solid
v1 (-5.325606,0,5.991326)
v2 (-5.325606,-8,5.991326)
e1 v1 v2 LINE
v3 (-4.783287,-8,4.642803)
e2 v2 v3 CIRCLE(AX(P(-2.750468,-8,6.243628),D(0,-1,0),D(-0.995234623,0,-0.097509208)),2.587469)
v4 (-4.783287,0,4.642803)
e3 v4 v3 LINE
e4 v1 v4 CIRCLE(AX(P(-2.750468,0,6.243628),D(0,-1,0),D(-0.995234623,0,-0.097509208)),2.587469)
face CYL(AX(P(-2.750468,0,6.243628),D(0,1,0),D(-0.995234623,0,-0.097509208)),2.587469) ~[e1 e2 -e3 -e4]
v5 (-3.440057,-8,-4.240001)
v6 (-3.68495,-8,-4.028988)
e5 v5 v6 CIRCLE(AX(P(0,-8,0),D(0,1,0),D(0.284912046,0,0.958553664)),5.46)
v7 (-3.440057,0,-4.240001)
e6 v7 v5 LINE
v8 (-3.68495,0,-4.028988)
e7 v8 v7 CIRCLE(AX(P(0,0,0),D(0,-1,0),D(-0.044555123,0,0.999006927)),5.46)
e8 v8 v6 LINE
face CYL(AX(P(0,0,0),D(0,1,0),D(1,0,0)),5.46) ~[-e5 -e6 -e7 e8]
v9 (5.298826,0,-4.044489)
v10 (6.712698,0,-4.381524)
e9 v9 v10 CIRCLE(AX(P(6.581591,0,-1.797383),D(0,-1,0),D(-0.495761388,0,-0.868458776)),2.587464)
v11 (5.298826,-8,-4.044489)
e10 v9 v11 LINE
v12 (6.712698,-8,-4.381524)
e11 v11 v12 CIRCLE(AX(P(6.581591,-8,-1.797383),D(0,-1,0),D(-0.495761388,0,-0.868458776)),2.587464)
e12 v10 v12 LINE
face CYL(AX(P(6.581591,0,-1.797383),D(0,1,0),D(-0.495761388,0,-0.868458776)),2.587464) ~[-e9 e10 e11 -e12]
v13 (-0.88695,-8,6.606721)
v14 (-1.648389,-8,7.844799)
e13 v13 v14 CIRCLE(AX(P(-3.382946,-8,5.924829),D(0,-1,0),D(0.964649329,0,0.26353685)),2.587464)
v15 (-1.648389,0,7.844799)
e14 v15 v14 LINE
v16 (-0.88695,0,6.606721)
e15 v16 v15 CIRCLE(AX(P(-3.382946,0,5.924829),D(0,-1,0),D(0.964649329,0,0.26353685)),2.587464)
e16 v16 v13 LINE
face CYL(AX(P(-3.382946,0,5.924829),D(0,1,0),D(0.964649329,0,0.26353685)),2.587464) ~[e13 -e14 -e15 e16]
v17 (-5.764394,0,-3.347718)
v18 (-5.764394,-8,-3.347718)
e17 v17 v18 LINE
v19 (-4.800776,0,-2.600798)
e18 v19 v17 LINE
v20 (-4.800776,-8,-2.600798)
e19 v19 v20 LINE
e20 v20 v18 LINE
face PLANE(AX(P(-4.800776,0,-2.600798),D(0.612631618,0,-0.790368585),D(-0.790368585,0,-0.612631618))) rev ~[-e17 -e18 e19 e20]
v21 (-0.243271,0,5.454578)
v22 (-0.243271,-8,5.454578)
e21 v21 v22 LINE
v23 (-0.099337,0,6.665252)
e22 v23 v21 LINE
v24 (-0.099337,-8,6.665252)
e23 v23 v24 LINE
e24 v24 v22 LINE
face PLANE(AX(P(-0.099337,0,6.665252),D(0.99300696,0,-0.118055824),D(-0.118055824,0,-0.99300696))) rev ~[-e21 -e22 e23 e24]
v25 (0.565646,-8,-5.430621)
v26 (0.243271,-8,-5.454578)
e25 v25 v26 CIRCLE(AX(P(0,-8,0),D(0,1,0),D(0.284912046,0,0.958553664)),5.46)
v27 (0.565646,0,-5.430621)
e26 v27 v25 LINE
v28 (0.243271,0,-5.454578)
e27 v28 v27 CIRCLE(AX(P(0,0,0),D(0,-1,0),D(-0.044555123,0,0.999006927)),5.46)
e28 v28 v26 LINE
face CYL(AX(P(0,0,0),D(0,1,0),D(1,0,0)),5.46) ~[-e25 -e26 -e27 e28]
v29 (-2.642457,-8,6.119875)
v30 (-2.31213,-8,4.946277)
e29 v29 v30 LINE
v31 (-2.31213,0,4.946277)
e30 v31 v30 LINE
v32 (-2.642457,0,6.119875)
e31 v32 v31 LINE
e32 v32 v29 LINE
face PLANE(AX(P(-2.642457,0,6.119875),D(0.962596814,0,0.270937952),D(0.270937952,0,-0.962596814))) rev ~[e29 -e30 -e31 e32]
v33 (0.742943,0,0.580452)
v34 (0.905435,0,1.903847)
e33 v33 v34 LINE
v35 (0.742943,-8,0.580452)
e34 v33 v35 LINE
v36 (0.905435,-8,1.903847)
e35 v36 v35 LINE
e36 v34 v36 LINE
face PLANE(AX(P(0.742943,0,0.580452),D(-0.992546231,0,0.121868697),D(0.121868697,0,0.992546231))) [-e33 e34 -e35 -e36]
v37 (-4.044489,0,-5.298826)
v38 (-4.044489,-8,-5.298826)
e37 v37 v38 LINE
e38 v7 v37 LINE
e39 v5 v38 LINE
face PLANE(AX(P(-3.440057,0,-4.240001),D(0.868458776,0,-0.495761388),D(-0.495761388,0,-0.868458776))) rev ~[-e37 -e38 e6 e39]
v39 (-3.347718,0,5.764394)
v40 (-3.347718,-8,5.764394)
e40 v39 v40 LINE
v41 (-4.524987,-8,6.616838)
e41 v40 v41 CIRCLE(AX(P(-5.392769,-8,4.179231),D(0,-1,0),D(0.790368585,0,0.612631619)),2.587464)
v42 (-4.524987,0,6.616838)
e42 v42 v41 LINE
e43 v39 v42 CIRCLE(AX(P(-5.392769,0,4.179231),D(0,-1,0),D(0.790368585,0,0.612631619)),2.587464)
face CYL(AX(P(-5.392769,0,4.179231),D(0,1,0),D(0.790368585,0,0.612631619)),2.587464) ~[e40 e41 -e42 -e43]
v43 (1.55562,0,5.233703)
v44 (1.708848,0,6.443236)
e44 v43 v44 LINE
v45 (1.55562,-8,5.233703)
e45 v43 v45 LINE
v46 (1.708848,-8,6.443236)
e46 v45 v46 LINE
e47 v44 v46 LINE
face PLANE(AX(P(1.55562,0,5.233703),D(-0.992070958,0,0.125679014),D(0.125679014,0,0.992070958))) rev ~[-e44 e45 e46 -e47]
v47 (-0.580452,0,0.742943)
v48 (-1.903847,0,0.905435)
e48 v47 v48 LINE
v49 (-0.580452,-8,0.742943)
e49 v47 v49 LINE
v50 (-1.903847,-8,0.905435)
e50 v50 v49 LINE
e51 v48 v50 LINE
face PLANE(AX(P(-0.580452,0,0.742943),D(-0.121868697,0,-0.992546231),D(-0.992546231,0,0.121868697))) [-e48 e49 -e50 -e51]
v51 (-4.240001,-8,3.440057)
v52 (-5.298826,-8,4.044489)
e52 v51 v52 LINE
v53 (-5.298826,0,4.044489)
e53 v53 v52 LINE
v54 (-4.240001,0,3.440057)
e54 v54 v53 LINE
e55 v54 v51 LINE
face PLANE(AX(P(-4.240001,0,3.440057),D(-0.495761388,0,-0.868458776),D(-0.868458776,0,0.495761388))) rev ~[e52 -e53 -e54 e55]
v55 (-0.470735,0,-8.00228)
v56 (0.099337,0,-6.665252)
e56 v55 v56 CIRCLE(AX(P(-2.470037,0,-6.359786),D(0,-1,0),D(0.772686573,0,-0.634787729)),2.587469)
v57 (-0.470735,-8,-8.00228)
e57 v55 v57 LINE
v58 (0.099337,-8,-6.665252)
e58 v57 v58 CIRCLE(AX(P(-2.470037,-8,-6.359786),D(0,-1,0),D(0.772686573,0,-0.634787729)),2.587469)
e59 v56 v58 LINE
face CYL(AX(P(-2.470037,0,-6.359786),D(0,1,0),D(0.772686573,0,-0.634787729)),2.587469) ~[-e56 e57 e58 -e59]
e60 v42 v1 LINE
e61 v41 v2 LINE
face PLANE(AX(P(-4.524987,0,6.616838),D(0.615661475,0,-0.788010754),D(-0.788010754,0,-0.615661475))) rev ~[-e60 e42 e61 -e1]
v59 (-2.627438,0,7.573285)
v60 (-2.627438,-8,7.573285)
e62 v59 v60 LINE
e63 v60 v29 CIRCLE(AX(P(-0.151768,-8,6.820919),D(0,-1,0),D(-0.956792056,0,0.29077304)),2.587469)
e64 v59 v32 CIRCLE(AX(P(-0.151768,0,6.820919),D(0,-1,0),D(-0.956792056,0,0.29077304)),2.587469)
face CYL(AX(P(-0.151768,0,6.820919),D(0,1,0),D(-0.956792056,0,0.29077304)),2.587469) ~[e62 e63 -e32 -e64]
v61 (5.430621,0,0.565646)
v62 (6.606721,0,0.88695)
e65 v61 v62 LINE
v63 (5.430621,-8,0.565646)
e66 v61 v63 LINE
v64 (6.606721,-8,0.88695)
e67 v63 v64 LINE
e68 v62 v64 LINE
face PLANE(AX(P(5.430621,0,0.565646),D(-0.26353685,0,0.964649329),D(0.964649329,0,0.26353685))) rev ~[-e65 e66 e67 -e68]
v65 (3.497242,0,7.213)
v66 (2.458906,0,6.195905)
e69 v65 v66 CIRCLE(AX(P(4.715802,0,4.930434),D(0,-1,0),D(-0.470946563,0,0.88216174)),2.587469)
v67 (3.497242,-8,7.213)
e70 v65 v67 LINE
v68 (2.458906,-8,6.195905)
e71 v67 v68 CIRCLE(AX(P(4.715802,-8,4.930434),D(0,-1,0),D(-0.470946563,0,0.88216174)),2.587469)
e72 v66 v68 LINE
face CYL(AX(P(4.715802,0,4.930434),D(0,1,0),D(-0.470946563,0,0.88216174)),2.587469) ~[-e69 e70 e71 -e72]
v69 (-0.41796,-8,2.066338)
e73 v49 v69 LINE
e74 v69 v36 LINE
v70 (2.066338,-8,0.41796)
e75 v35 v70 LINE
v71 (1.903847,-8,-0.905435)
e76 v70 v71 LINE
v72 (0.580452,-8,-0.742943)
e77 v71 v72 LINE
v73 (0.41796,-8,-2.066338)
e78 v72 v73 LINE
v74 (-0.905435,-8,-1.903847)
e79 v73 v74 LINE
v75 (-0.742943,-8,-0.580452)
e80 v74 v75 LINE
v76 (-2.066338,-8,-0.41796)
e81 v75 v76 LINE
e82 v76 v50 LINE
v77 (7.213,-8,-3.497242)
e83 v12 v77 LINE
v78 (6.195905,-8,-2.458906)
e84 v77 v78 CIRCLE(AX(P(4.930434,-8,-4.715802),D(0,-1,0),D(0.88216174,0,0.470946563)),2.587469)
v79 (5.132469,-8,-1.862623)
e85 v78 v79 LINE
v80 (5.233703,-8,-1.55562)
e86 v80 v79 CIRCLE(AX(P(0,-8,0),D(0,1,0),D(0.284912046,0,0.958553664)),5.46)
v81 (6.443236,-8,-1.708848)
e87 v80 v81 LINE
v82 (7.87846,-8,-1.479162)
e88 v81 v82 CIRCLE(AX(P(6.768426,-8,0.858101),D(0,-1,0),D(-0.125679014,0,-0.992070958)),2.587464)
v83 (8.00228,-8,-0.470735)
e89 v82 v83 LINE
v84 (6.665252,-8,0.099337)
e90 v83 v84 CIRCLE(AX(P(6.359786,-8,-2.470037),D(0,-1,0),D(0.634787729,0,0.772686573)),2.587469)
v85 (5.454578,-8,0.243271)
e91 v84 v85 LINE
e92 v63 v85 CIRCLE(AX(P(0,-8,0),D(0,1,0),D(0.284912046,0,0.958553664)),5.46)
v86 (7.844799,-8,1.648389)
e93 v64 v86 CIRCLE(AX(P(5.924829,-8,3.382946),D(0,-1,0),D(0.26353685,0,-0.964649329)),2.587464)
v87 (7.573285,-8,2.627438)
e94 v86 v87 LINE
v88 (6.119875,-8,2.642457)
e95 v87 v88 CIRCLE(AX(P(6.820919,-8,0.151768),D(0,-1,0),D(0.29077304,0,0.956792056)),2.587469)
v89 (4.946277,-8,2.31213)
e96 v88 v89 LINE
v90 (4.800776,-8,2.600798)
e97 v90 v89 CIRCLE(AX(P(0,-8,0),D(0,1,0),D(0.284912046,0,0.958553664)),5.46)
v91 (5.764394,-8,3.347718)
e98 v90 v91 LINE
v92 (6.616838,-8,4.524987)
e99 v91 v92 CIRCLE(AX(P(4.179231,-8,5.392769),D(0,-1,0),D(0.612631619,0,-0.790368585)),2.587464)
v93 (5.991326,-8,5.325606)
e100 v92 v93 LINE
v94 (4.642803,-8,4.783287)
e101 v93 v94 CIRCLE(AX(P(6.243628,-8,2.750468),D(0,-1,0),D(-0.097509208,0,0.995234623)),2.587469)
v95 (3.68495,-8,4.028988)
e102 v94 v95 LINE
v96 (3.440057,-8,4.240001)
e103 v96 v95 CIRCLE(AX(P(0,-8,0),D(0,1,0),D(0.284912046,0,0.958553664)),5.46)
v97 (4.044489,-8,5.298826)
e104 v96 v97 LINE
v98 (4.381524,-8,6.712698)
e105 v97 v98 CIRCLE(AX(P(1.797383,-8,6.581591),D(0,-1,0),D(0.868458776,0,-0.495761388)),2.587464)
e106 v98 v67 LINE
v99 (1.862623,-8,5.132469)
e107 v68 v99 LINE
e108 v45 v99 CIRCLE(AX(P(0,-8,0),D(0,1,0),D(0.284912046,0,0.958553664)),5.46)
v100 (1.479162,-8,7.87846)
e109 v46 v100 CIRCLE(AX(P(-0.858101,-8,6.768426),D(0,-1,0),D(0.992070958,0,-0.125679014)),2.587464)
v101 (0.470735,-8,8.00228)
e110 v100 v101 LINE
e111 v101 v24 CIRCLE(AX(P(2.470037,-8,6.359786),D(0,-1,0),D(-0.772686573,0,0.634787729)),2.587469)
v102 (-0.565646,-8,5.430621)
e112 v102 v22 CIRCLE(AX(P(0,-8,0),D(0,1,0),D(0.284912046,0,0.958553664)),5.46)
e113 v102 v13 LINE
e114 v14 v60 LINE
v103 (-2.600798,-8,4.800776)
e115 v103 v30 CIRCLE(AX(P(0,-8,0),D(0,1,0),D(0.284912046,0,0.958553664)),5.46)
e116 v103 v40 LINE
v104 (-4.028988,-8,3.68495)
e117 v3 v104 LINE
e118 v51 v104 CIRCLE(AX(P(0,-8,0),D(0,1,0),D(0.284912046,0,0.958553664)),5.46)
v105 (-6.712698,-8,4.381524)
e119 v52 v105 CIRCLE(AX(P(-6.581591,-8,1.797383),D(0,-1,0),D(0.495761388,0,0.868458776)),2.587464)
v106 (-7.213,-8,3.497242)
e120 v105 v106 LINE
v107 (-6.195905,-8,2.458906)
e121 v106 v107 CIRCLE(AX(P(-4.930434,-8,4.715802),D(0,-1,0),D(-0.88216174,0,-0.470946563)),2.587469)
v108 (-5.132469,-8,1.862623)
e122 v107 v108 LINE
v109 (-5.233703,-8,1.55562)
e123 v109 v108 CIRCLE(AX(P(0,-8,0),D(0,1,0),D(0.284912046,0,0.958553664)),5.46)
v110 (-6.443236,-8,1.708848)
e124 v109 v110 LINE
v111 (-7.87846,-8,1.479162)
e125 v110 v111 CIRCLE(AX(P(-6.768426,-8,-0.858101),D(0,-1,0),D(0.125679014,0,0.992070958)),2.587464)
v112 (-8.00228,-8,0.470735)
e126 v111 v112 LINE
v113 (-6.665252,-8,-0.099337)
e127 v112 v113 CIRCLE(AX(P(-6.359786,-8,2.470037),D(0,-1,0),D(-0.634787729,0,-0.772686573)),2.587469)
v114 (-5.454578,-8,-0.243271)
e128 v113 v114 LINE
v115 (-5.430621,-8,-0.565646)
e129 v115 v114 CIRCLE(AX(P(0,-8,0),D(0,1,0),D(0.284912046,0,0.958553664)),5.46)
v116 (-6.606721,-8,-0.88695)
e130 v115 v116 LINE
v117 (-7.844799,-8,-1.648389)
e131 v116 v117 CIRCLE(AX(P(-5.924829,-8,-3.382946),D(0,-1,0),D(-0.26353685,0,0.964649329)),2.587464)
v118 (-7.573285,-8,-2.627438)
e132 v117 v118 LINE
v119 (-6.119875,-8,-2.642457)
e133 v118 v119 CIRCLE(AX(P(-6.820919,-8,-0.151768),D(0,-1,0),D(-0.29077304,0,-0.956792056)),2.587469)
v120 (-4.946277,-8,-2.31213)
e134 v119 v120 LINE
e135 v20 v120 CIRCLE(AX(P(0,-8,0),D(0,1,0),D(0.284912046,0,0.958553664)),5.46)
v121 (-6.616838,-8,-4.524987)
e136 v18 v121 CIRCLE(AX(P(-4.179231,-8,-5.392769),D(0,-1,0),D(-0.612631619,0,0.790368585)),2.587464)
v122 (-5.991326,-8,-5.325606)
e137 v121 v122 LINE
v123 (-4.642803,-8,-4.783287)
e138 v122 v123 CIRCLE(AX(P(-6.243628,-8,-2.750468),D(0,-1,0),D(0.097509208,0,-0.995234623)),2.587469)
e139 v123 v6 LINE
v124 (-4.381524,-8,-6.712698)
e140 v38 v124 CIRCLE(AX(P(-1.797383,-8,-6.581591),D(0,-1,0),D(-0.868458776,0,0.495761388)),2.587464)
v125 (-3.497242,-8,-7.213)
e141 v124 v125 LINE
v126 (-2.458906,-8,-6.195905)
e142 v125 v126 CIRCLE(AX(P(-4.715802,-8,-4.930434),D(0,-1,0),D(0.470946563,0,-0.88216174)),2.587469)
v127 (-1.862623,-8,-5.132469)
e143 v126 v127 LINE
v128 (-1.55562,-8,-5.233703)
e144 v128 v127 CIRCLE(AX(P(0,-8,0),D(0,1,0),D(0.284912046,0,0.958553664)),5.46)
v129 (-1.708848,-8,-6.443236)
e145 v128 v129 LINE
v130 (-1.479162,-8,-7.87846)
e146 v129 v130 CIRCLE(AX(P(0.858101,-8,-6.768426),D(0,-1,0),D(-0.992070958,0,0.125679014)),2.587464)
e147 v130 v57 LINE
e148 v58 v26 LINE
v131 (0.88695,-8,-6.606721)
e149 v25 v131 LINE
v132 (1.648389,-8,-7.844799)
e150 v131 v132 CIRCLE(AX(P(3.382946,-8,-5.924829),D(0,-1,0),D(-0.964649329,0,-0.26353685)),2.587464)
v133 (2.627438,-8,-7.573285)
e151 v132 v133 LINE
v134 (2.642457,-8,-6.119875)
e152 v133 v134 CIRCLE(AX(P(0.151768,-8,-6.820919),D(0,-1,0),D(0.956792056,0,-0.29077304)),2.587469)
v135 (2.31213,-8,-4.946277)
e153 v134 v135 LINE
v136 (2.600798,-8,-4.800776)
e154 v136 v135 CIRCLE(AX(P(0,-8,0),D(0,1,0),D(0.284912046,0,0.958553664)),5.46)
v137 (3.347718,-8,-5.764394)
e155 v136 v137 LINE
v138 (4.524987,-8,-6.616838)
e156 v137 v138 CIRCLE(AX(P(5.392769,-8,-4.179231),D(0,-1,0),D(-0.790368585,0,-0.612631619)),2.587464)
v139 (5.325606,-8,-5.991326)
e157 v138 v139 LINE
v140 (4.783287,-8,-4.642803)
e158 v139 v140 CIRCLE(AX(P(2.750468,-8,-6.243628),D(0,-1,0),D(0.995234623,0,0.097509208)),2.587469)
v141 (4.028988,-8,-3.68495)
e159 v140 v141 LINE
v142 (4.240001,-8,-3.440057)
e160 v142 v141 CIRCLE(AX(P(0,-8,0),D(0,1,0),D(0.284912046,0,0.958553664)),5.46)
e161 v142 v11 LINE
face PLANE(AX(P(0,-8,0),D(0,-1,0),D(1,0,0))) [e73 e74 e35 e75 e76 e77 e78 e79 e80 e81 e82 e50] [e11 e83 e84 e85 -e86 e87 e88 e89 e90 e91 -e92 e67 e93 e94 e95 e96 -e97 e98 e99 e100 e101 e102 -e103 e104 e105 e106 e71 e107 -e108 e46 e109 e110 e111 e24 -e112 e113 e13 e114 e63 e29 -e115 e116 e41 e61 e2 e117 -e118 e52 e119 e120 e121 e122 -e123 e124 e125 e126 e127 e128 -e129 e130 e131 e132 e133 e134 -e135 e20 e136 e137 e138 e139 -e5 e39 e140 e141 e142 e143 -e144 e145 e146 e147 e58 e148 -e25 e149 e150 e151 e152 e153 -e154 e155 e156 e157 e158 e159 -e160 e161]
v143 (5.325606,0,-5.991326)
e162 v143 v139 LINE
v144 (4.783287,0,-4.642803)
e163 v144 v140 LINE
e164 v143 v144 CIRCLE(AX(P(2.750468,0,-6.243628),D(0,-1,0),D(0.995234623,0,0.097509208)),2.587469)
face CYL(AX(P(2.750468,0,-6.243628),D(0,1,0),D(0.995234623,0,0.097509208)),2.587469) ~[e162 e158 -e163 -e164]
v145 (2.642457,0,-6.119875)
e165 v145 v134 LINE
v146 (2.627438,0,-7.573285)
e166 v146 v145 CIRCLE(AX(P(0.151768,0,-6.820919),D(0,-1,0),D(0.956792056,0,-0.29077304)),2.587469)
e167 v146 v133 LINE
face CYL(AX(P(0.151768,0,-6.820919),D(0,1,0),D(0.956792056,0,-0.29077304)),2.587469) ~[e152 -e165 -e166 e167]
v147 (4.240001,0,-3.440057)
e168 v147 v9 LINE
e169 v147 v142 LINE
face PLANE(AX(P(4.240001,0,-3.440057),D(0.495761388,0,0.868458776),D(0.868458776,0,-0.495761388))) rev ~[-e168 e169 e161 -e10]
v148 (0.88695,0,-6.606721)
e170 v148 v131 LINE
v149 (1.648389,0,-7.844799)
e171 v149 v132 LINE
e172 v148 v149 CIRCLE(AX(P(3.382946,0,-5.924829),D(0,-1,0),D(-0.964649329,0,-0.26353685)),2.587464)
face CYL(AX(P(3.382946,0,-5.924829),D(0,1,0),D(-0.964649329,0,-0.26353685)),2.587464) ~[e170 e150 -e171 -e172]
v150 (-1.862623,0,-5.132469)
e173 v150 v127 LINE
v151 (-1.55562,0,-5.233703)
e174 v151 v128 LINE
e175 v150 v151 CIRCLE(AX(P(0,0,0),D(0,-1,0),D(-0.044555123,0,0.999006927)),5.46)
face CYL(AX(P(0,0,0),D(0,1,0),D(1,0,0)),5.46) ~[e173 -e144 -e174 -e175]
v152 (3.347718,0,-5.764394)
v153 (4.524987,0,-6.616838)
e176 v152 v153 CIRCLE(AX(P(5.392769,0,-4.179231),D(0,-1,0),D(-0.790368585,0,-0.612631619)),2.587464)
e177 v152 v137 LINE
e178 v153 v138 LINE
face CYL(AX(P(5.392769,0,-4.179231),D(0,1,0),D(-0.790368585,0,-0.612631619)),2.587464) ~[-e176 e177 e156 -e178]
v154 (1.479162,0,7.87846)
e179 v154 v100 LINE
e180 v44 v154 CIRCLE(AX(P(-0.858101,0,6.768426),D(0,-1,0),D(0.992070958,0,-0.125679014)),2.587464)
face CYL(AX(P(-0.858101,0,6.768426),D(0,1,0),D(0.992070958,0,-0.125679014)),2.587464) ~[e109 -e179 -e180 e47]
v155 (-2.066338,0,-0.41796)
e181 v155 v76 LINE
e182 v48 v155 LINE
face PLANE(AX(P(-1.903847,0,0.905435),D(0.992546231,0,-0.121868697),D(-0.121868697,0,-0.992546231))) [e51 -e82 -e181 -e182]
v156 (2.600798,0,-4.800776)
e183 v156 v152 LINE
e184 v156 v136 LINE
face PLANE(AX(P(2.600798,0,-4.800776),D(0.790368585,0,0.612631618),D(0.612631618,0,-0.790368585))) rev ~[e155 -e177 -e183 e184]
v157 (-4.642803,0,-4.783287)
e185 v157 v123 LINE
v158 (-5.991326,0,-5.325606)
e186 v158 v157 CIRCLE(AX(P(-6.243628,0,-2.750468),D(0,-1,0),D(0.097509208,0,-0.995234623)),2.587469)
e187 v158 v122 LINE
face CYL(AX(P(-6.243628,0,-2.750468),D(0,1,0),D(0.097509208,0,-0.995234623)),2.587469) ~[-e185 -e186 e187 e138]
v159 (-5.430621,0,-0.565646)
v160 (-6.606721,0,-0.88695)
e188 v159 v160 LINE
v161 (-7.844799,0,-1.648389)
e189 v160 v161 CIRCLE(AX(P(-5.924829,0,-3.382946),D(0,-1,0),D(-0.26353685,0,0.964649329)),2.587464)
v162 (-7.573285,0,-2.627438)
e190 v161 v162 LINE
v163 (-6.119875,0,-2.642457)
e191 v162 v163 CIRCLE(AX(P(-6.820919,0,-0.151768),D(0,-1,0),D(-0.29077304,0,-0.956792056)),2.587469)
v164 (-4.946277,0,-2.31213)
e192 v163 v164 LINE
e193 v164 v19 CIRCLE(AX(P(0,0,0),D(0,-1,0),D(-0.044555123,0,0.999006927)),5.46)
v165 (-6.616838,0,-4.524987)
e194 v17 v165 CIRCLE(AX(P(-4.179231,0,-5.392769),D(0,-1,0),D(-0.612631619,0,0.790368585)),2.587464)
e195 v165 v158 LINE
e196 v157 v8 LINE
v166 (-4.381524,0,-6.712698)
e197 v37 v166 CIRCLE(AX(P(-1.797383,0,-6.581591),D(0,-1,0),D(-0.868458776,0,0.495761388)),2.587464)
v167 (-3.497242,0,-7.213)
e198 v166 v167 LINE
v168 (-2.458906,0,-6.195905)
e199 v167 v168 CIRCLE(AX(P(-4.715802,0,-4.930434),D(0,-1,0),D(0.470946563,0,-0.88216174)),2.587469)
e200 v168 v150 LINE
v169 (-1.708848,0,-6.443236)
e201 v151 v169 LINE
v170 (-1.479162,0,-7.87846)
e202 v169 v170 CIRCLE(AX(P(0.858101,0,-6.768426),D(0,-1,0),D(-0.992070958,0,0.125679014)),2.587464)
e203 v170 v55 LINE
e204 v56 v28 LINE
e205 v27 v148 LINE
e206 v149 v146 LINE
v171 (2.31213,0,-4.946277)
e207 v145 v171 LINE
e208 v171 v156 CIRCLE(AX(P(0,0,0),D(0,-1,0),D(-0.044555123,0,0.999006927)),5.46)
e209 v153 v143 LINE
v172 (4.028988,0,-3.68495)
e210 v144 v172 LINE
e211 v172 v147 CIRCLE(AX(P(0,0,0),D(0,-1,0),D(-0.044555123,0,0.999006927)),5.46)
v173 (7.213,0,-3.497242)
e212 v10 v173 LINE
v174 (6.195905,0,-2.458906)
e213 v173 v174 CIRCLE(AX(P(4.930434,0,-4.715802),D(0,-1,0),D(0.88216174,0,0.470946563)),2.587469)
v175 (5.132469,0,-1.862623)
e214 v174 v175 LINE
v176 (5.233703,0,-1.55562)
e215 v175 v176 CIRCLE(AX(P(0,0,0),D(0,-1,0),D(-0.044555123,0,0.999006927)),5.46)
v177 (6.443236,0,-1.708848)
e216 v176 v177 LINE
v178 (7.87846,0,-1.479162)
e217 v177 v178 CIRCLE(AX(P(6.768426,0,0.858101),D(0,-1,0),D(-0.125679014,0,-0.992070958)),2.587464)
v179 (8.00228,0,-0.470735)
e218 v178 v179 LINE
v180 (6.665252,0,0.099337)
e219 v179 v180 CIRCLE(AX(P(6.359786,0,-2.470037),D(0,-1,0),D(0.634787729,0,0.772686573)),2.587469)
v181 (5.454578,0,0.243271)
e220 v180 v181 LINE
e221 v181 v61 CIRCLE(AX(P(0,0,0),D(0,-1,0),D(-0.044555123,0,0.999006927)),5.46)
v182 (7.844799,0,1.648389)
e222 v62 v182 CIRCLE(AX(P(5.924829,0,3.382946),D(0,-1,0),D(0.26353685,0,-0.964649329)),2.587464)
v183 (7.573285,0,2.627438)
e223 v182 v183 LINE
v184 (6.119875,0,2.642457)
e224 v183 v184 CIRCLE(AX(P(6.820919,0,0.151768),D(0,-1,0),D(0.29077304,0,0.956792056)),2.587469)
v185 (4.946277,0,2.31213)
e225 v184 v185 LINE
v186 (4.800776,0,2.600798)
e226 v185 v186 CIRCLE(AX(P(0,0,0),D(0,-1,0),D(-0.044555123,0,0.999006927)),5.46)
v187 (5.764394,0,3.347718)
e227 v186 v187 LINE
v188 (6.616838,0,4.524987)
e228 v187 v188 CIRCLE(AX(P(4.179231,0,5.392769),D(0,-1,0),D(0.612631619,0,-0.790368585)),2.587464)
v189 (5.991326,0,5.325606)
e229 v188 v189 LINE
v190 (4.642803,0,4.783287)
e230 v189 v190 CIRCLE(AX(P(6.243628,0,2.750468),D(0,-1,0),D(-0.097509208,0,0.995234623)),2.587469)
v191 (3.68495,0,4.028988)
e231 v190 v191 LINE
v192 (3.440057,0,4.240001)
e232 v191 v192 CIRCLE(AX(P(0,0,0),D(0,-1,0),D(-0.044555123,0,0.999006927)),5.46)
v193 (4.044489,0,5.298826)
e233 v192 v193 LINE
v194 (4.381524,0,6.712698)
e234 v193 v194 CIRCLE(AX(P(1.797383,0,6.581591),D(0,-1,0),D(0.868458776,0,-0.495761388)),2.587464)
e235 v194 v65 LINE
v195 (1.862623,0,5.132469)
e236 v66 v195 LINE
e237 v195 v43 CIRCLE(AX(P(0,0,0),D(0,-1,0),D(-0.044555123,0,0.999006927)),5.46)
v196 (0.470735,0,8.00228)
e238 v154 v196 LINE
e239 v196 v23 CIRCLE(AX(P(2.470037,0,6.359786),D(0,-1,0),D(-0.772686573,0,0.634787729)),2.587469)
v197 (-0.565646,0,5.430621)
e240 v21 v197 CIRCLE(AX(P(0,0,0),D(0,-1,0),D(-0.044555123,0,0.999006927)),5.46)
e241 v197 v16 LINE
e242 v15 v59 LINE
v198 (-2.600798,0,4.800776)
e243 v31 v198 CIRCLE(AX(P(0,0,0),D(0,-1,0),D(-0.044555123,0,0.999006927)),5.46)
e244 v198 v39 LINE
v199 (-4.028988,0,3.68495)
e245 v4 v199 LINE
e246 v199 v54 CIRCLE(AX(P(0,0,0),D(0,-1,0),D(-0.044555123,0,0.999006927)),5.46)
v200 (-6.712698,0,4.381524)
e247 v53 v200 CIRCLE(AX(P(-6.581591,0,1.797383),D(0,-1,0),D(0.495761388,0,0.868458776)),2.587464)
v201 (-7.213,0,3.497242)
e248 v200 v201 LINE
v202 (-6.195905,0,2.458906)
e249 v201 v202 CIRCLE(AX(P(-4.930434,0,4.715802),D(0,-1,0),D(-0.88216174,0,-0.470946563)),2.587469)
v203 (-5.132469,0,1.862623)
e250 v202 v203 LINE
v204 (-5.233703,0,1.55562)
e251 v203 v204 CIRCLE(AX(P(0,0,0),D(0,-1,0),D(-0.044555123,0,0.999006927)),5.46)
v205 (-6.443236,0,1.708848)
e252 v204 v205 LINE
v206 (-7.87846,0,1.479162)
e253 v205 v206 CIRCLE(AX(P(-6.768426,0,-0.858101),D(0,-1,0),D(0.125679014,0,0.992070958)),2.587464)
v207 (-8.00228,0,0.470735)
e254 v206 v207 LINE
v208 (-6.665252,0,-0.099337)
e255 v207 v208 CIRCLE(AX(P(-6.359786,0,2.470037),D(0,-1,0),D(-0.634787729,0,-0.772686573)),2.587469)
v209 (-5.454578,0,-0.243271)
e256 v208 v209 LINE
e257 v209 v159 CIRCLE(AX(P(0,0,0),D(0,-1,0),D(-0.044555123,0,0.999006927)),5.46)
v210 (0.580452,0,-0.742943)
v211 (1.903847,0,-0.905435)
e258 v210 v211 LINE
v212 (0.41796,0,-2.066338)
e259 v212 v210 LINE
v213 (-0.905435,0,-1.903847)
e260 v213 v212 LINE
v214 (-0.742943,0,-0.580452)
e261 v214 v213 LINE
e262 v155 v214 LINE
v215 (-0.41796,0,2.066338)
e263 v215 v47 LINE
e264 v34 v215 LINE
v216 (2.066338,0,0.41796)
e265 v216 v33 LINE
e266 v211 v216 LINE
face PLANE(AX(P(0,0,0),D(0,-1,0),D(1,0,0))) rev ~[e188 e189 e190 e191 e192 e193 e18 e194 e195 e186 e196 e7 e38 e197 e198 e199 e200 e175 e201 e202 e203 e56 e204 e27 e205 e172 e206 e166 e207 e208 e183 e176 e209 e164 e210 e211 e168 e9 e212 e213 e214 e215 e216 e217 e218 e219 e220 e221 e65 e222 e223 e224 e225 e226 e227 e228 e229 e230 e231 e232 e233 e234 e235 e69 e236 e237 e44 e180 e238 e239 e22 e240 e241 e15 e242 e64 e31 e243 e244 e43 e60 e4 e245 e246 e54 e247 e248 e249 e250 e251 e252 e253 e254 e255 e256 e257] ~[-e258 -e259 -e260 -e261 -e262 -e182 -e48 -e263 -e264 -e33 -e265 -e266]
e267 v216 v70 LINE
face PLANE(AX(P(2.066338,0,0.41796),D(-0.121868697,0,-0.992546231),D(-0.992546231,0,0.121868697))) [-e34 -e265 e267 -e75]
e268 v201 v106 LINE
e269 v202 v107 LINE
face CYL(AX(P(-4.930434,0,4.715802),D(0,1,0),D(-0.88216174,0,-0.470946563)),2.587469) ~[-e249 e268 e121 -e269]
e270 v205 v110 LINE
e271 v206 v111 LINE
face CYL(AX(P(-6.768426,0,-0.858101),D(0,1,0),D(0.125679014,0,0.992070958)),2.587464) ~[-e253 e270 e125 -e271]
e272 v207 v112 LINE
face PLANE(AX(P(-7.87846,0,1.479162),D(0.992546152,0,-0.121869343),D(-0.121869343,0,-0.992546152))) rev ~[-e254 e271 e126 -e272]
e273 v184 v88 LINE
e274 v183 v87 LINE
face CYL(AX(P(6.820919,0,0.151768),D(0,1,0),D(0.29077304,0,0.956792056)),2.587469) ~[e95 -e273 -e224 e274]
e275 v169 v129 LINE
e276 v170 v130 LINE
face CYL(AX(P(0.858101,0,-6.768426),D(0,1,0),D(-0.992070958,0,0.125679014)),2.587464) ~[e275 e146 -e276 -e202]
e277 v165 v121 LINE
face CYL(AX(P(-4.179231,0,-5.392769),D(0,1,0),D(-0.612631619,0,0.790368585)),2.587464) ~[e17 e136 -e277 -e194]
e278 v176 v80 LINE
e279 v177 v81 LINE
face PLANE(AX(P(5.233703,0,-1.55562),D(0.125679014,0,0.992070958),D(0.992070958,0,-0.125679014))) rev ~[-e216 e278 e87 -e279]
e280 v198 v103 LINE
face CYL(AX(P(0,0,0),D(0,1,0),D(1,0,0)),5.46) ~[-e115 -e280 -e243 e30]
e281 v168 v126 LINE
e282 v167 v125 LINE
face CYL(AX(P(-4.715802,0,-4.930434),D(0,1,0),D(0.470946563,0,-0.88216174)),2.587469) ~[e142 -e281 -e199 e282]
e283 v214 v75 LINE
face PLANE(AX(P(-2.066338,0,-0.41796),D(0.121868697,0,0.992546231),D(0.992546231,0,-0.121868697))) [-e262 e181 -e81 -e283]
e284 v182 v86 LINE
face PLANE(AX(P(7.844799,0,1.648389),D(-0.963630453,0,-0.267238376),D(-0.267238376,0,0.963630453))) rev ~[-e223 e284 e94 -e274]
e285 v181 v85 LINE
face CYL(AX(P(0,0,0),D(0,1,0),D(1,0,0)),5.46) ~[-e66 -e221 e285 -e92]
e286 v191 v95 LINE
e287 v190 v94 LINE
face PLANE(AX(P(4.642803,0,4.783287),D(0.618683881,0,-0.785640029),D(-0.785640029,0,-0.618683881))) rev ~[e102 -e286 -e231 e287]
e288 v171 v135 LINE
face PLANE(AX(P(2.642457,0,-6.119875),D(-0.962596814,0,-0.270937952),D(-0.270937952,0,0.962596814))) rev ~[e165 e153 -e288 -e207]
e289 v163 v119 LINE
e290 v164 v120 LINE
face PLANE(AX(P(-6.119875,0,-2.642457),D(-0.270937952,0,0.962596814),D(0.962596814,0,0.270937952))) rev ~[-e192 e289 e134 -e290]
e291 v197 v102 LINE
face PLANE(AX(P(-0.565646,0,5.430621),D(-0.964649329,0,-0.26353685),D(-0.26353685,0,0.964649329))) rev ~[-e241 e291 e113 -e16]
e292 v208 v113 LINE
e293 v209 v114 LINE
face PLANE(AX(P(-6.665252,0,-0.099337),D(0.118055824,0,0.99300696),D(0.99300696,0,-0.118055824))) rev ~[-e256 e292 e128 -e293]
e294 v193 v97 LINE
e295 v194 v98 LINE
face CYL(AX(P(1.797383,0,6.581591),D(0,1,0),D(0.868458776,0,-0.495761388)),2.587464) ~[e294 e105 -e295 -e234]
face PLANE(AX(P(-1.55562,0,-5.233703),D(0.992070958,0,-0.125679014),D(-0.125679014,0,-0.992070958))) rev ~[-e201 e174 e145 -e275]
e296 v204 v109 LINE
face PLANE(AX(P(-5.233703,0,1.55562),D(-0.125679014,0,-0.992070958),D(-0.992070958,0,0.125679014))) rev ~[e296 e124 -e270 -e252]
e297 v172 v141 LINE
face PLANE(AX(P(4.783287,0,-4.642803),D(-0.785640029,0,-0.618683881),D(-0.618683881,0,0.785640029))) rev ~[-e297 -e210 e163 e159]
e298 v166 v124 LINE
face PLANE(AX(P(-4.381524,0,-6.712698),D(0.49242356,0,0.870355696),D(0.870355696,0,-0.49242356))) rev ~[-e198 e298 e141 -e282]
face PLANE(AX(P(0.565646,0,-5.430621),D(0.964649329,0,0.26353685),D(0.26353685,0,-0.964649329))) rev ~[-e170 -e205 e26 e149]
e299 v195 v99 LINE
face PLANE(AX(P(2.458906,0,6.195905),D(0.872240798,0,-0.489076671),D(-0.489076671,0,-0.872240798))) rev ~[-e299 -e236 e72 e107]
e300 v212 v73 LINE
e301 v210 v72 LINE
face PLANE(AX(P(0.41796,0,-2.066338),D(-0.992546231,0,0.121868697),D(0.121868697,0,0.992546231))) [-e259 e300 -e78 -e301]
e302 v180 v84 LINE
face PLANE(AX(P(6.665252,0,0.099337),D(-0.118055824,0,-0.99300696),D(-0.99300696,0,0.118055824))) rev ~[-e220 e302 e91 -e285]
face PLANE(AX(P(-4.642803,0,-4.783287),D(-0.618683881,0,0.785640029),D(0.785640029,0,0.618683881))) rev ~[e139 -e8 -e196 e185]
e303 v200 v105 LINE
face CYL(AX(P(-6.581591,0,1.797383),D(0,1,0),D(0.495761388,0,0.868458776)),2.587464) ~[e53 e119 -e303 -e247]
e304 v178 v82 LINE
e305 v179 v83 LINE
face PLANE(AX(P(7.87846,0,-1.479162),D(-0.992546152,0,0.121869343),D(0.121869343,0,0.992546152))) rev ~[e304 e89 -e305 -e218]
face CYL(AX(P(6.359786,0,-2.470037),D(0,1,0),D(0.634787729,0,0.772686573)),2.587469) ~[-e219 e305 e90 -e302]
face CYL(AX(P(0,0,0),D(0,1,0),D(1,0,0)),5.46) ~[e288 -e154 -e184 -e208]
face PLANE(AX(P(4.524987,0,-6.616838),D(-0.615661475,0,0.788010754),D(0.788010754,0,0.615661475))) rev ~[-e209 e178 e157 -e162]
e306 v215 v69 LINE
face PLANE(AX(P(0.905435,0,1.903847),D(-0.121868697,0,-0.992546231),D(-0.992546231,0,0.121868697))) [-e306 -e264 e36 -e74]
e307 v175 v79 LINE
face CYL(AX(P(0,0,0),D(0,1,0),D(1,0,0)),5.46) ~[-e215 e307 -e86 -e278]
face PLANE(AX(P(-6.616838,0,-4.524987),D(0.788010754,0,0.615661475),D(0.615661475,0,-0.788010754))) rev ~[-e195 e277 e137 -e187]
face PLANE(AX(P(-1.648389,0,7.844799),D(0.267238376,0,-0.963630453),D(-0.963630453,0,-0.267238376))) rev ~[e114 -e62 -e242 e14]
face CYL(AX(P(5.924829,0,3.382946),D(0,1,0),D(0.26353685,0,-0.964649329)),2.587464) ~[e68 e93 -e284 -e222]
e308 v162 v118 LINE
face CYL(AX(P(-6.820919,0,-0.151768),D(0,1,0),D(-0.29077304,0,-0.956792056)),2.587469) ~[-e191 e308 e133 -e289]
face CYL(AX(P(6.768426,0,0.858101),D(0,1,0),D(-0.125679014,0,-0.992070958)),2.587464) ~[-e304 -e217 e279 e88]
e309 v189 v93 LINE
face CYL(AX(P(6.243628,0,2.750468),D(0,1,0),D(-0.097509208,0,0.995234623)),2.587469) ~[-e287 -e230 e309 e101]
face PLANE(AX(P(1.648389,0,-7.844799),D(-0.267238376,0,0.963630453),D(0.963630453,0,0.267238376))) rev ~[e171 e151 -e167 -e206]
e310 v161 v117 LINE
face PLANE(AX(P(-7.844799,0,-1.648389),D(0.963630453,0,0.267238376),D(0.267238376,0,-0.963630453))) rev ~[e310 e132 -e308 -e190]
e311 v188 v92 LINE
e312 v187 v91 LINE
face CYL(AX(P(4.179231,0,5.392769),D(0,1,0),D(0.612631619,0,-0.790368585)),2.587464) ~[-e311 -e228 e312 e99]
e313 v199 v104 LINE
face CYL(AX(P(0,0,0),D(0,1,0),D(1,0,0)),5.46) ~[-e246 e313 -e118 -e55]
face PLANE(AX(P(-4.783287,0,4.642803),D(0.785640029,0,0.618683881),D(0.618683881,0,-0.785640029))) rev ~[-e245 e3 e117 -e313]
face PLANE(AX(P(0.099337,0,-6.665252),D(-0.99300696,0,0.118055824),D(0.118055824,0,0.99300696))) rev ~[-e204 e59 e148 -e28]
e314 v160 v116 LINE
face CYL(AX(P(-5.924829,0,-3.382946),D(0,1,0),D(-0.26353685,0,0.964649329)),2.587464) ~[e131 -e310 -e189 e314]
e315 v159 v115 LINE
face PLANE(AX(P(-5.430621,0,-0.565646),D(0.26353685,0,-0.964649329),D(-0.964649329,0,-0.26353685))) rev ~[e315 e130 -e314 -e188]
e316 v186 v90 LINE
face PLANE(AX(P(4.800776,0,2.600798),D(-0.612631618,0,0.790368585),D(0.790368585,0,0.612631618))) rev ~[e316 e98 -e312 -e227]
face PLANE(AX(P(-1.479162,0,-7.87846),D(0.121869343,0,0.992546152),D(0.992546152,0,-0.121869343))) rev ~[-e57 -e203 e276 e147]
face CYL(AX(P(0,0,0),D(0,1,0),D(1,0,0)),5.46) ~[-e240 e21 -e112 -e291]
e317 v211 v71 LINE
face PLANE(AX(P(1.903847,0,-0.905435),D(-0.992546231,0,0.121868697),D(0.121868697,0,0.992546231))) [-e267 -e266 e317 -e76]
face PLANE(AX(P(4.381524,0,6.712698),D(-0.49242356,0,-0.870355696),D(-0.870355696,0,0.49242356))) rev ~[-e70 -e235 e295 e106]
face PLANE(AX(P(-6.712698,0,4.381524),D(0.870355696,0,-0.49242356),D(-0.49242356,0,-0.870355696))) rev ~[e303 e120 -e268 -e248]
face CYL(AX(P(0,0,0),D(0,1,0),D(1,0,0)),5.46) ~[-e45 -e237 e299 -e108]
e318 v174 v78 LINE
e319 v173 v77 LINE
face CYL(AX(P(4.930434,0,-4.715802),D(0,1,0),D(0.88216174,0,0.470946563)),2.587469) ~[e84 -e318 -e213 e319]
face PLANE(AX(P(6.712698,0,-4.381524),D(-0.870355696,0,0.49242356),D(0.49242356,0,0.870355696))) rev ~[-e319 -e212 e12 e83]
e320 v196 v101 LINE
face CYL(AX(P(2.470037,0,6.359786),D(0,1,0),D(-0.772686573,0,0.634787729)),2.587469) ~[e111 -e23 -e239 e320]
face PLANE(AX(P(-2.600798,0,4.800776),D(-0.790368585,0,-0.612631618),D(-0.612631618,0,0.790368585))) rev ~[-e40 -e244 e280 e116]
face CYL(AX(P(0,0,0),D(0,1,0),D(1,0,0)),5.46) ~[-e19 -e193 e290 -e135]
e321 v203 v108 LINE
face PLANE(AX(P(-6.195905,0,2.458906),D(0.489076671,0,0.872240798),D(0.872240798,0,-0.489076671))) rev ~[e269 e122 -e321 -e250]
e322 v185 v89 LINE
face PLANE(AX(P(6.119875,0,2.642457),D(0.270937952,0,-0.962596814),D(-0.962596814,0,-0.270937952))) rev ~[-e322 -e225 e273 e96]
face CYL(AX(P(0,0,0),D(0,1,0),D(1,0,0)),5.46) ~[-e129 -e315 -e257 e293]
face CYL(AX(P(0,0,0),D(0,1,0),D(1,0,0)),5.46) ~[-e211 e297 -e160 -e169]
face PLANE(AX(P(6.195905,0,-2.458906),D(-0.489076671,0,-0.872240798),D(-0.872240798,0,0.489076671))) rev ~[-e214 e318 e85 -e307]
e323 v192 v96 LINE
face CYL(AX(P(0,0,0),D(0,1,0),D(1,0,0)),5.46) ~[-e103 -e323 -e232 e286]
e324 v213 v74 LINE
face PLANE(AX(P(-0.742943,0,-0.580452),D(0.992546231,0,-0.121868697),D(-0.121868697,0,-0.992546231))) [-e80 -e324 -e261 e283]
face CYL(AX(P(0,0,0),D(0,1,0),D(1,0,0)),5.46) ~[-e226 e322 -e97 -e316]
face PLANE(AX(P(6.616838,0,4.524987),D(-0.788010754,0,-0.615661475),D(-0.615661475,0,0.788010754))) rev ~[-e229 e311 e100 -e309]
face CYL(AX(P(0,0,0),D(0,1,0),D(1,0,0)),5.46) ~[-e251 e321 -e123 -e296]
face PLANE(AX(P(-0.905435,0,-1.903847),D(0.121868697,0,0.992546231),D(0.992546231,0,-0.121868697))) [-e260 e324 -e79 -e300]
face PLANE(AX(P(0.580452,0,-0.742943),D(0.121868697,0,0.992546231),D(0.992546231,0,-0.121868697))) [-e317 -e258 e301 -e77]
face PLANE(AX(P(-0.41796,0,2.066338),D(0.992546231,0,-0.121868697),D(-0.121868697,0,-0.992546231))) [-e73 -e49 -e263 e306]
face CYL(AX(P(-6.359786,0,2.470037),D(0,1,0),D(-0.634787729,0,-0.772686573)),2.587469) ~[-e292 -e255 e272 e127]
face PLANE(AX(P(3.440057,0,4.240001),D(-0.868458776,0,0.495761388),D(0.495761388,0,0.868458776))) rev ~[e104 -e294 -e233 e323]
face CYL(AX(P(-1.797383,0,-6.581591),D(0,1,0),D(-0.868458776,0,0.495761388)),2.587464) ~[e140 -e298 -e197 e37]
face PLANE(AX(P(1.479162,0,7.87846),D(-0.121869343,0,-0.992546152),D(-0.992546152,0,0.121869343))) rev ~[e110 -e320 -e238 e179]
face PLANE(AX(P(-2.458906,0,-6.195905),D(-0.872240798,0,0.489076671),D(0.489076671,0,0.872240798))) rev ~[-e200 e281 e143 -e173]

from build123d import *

# Parameters (mm, degrees)
F2_R            = 5.46
F3_DEPTH        = 8
F4_DEPTH        = 8
F4_COPIES_COUNT = 16
F6_DEPTH        = 25.4


# Not quite as in the source:
# - a pattern or mirror of a feature is missing from the dataset's text; its kind, count and spacing are read off the source's solid


with BuildPart() as f3:
    # F2 (on Front) → F3 (new body)
    with BuildSketch(Plane.XZ):
        Circle(F2_R)
    extrude(amount=F3_DEPTH)

    # F0 (on Front) → F4 (join, through all)
    with BuildSketch(Plane.XZ):
        with BuildLine():
            Line((1.4791617247, 7.8784603808), (0.4707348346, 8.0022796337))
            ThreePointArc((0.4707348346, 8.0022796337), (0.0898874426, 7.3746171039), (-0.099337312, 6.6652519091))
            Line((-0.099337312, 6.6652519091), (-0.2432709729, 5.4545778236))
            ThreePointArc((-0.2432709729, 5.4545778236), (0.6654030831, 5.4193024216), (1.5556197703, 5.2337030036))
            Line((1.5556197703, 5.2337030036), (1.7088476245, 6.4432359154))
            ThreePointArc((1.7088476245, 6.4432359154), (1.6968529376, 7.1773074522), (1.4791617247, 7.8784603808))
        make_face()
    f4 = extrude(amount=F4_DEPTH)

    # F4_copies: F4 ×16 about axis
    f4_copies_axis = Axis((0, 0, 0), (0, 1, 0))
    for i in range(1, F4_COPIES_COUNT):
        add(f4.rotate(f4_copies_axis, i * 360 / F4_COPIES_COUNT))

    # F5 (on Front) → F6 (cut)
    with BuildSketch(Plane.XZ):
        Polygon((0.7429432851, 0.5804516897), (0.9054348805, 1.9038466644), (0.2437373931, 1.9850924621), (-0.4179600943, 2.0663382598), (-0.5804516897, 0.7429432851), (-1.9038466644, 0.9054348805), (-1.9850924621, 0.2437373931), (-2.0663382598, -0.4179600943), (-0.7429432851, -0.5804516897), (-0.9054348805, -1.9038466644), (-0.2437373931, -1.9850924621), (0.4179600943, -2.0663382598), (0.5804516897, -0.7429432851), (1.9038466644, -0.9054348805), (1.9850924621, -0.2437373931), (2.0663382598, 0.4179600943), align=None)
    extrude(amount=F6_DEPTH, mode=Mode.SUBTRACT)


solid = f3.part
